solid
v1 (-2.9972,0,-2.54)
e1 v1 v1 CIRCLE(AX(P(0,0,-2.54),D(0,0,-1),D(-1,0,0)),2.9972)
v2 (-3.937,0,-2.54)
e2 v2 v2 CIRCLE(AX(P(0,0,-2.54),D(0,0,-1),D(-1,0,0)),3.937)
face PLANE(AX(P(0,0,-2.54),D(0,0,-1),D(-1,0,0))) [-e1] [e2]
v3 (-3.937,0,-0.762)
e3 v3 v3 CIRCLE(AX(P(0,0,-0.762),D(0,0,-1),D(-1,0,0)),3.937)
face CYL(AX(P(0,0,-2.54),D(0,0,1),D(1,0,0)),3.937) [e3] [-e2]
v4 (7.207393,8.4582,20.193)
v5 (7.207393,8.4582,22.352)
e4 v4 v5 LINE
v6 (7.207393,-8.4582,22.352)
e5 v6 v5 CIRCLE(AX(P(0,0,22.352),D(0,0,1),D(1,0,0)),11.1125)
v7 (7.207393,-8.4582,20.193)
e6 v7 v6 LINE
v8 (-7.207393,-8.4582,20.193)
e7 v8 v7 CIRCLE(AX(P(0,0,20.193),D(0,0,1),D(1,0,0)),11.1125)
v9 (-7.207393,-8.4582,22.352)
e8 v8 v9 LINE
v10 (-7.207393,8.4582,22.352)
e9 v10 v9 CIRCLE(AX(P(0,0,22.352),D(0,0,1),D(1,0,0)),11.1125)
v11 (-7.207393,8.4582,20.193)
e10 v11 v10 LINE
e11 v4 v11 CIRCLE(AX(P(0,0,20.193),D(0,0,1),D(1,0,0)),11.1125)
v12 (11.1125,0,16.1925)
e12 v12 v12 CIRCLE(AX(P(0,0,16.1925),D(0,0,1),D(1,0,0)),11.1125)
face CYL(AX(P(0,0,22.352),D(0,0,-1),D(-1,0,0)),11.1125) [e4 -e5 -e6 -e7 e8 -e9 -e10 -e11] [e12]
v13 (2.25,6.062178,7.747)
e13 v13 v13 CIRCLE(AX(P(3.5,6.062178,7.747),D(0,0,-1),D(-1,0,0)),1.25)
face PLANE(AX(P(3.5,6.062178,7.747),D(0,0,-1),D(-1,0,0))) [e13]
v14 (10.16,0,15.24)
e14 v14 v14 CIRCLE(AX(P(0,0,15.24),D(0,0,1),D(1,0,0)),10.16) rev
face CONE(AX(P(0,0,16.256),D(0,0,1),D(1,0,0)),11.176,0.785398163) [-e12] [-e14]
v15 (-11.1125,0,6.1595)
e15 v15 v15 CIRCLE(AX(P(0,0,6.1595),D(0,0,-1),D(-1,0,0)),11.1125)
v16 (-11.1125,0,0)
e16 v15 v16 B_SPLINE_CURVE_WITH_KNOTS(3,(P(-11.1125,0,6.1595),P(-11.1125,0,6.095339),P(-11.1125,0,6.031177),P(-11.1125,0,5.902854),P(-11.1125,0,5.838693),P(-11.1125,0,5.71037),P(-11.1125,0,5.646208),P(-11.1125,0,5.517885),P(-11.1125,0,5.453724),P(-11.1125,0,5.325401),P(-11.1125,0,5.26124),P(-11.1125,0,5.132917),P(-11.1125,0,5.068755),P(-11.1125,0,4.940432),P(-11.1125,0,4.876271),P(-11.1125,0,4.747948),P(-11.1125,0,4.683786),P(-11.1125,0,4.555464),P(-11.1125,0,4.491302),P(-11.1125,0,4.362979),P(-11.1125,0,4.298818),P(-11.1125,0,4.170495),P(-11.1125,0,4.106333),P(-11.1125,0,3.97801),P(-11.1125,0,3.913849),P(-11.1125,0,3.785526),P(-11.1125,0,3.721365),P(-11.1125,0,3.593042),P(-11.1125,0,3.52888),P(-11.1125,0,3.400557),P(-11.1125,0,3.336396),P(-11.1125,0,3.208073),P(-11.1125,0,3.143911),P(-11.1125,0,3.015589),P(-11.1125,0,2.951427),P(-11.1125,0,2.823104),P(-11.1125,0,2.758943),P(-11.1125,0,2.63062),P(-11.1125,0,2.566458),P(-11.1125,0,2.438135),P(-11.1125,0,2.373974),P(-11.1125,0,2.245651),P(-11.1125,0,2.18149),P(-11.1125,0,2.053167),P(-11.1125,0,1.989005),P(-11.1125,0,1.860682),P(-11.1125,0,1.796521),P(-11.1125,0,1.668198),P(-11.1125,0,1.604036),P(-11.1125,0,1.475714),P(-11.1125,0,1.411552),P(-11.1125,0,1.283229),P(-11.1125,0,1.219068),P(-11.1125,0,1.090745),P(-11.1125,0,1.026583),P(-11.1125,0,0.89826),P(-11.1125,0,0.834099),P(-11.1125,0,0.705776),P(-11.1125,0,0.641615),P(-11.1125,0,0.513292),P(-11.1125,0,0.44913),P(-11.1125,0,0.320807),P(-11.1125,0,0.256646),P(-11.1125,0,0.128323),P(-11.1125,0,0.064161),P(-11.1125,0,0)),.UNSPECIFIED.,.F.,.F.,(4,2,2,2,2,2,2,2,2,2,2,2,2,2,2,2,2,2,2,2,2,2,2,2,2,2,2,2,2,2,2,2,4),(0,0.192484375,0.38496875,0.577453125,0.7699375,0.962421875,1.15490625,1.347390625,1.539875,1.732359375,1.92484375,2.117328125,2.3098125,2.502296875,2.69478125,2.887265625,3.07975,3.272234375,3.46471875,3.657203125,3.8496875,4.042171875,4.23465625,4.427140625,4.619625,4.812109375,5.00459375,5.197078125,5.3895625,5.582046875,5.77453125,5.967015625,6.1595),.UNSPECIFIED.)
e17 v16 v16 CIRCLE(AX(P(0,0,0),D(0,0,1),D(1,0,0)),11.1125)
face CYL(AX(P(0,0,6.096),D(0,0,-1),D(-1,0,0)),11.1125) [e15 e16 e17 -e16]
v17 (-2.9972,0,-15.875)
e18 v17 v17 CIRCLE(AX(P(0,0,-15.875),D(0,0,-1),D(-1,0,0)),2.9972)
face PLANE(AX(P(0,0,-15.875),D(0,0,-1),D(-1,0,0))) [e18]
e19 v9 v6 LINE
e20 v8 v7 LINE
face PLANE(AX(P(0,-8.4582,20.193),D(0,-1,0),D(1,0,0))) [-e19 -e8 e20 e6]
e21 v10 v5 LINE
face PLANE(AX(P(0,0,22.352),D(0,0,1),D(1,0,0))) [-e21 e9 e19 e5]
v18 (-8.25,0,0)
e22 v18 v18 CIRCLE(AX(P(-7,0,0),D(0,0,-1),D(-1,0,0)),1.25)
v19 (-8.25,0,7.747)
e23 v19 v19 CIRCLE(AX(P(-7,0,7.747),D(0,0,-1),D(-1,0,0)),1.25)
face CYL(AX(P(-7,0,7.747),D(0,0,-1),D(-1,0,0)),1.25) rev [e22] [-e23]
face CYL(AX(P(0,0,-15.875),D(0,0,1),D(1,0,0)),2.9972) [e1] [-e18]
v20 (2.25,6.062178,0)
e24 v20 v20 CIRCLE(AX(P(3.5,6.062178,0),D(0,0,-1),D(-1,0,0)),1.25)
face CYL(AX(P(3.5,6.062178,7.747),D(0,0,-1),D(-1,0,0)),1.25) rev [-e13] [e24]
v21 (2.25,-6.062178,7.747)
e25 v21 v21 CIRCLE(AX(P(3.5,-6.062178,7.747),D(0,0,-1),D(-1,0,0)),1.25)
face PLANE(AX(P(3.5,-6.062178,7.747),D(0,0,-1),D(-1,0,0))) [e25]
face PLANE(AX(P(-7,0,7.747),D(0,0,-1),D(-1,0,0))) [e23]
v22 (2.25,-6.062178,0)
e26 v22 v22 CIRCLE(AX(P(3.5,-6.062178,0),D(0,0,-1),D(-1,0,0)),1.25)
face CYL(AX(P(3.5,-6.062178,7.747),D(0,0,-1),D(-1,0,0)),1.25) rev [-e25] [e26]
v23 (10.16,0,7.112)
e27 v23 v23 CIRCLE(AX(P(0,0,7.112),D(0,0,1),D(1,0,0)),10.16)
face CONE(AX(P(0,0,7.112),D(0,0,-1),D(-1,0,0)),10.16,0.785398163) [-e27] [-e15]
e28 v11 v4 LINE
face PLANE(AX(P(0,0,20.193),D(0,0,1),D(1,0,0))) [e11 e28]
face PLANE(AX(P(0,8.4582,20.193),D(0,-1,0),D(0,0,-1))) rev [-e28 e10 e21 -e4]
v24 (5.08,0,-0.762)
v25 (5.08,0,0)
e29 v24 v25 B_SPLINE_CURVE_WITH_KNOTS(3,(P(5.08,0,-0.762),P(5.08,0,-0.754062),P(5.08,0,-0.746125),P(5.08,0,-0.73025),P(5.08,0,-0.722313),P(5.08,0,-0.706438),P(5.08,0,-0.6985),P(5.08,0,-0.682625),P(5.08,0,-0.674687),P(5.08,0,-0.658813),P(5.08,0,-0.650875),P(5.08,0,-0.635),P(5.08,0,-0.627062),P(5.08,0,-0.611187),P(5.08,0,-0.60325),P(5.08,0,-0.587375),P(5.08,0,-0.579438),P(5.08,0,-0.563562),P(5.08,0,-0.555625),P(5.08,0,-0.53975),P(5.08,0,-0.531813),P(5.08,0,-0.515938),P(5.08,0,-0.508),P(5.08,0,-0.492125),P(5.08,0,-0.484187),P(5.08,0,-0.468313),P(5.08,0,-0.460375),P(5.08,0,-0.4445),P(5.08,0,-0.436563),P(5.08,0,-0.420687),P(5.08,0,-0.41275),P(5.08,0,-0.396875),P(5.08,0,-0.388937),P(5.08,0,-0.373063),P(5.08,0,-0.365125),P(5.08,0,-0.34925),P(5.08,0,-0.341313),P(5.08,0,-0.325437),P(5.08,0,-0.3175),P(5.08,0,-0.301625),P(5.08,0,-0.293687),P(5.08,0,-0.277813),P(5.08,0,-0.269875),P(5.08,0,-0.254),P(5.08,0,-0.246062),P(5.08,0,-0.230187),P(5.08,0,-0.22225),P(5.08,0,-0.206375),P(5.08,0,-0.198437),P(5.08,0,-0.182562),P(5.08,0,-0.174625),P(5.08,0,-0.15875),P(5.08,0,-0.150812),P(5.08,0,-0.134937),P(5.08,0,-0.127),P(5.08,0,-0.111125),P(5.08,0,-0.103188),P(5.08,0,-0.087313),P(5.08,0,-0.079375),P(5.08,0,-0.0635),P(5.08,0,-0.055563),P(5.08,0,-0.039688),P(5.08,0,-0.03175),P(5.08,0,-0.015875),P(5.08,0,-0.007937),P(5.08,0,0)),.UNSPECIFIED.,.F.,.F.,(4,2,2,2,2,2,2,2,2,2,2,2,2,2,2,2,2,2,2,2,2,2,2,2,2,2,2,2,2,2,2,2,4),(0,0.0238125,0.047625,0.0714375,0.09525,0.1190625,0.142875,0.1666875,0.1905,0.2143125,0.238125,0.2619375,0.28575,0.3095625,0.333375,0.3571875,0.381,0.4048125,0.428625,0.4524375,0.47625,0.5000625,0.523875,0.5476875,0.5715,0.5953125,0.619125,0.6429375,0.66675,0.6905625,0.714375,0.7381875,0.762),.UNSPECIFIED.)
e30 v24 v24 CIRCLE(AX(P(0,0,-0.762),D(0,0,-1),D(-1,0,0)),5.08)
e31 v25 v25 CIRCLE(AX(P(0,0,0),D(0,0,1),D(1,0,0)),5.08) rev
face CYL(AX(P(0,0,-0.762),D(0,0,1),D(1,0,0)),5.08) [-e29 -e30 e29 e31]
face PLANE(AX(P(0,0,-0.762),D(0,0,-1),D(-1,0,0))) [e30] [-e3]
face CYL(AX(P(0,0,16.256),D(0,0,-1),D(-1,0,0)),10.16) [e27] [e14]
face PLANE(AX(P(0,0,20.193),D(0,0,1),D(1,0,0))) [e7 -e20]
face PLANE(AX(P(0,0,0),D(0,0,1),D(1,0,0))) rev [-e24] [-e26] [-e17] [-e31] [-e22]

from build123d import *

# Parameters (mm, degrees)
SKETCH1_R           = 11.1125
BOSS_EXTRUDE1_DEPTH = 6.096
SKETCH2_R           = 10.16
BOSS_EXTRUDE2_DEPTH = 10.16
SKETCH3_R           = 11.1125
BOSS_EXTRUDE3_DEPTH = 6.096
CUT_EXTRUDE1_START  = -2.159
CUT_EXTRUDE1_DEPTH  = 2.159
CHAMFER1_SIZE       = 1.016
SKETCH5_R           = 5.08
BOSS_EXTRUDE4_DEPTH = 0.762
SKETCH6_R           = 3.937
BOSS_EXTRUDE5_DEPTH = 1.778
SKETCH7_R           = 2.9972
BOSS_EXTRUDE6_DEPTH = 13.335
SKETCH8_R           = 1.25
CUT_EXTRUDE2_DEPTH  = 7.747


with BuildPart() as part:
    # Sketch1 → Boss-Extrude1 (new body)
    with BuildSketch(Plane.XY):
        with Locations(Location((0, 0, 0), (0, 0, 180))):
            Circle(SKETCH1_R)
    extrude(amount=BOSS_EXTRUDE1_DEPTH)

    # Sketch2 → Boss-Extrude2 (add)
    with BuildSketch(Plane.XY.offset(6.096)):
        Circle(SKETCH2_R)
    extrude(amount=BOSS_EXTRUDE2_DEPTH)

    # Sketch3 → Boss-Extrude3 (add)
    with BuildSketch(Plane.XY.offset(16.256)):
        with Locations(Location((0, 0, 0), (0, 0, 180))):
            Circle(SKETCH3_R)
    extrude(amount=BOSS_EXTRUDE3_DEPTH)

    # Sketch4 → Cut-Extrude1 (cut)
    with BuildSketch(Plane.XY.offset(22.352).offset(CUT_EXTRUDE1_START)):
        with BuildLine():
            ThreePointArc((7.207392664, 8.4582), (0, 11.1125), (-7.207392664, 8.4582))
            Line((-7.207392664, 8.4582), (7.207392664, 8.4582))
        make_face()
        with BuildLine():
            Line((7.207392664, -8.4582), (-7.207392664, -8.4582))
            ThreePointArc((-7.207392664, -8.4582), (0, -11.1125), (7.207392664, -8.4582))
        make_face()
    extrude(amount=CUT_EXTRUDE1_DEPTH, mode=Mode.SUBTRACT)

    # Chamfer1
    # the kernel refuses this chamfer: 1.016 mm, written as the material it adds along each edge
    with BuildSketch(Plane(origin=(0, 0, 6.096), x_dir=(1, 0, 0), z_dir=(0, -1, 0))) as chamfer1_piece_1_section:
        Polygon((10.16, CHAMFER1_SIZE), (10.16 + CHAMFER1_SIZE, 0), (10.16, 0), align=None)
    chamfer1_piece_1 = revolve(axis=Axis((0, 0, 6.096), (0, 0, 1)), mode=Mode.PRIVATE)
    chamfer1_piece_1 = chamfer1_piece_1 & Plane(origin=(0, 0, 6.626545895), x_dir=(-1, 0, 0), z_dir=(0, 0, -1)) * Cylinder(11.1125, 45, mode=Mode.PRIVATE)
    add(chamfer1_piece_1)
    with BuildSketch(Plane(origin=(0, 0, 16.256), x_dir=(1, 0, 0), z_dir=(0, -1, 0))) as chamfer1_piece_2_section:
        Polygon((10.16 + CHAMFER1_SIZE, 0), (10.16, -CHAMFER1_SIZE), (10.16, 0), align=None)
    chamfer1_piece_2 = revolve(axis=Axis((0, 0, 16.256), (0, 0, 1)), mode=Mode.PRIVATE)
    chamfer1_piece_2 = chamfer1_piece_2 & Plane(origin=(0, 0, 15.725454105), x_dir=(-1, 0, 0), z_dir=(0, 0, -1)) * Cylinder(11.1125, 45, mode=Mode.PRIVATE)
    add(chamfer1_piece_2)

    # Sketch5 → Boss-Extrude4 (add)
    with BuildSketch(Plane(origin=(0, 0, 0), x_dir=(-1, 0, 0), z_dir=(0, 0, -1))):
        with Locations(Location((0, 0, 0), (0, 0, 180))):
            Circle(SKETCH5_R)
    extrude(amount=BOSS_EXTRUDE4_DEPTH)

    # Sketch6 → Boss-Extrude5 (add)
    with BuildSketch(Plane(origin=(0, 0, -0.762), x_dir=(-1, 0, 0), z_dir=(0, 0, -1))):
        Circle(SKETCH6_R)
    extrude(amount=BOSS_EXTRUDE5_DEPTH)

    # Sketch7 → Boss-Extrude6 (add)
    with BuildSketch(Plane(origin=(0, 0, -2.54), x_dir=(-1, 0, 0), z_dir=(0, 0, -1))):
        Circle(SKETCH7_R)
    extrude(amount=BOSS_EXTRUDE6_DEPTH)

    # Sketch8 → Cut-Extrude2 (cut)
    with BuildSketch(Plane(origin=(0, 0, 0), x_dir=(-1, 0, 0), z_dir=(0, 0, -1))):
        with Locations((7, 0)):
            Circle(SKETCH8_R)
        with Locations((-3.5, -6.062177826)):
            Circle(SKETCH8_R)
        with Locations((-3.5, 6.062177826)):
            Circle(SKETCH8_R)
    extrude(amount=-CUT_EXTRUDE2_DEPTH, mode=Mode.SUBTRACT)


solid = part.part
